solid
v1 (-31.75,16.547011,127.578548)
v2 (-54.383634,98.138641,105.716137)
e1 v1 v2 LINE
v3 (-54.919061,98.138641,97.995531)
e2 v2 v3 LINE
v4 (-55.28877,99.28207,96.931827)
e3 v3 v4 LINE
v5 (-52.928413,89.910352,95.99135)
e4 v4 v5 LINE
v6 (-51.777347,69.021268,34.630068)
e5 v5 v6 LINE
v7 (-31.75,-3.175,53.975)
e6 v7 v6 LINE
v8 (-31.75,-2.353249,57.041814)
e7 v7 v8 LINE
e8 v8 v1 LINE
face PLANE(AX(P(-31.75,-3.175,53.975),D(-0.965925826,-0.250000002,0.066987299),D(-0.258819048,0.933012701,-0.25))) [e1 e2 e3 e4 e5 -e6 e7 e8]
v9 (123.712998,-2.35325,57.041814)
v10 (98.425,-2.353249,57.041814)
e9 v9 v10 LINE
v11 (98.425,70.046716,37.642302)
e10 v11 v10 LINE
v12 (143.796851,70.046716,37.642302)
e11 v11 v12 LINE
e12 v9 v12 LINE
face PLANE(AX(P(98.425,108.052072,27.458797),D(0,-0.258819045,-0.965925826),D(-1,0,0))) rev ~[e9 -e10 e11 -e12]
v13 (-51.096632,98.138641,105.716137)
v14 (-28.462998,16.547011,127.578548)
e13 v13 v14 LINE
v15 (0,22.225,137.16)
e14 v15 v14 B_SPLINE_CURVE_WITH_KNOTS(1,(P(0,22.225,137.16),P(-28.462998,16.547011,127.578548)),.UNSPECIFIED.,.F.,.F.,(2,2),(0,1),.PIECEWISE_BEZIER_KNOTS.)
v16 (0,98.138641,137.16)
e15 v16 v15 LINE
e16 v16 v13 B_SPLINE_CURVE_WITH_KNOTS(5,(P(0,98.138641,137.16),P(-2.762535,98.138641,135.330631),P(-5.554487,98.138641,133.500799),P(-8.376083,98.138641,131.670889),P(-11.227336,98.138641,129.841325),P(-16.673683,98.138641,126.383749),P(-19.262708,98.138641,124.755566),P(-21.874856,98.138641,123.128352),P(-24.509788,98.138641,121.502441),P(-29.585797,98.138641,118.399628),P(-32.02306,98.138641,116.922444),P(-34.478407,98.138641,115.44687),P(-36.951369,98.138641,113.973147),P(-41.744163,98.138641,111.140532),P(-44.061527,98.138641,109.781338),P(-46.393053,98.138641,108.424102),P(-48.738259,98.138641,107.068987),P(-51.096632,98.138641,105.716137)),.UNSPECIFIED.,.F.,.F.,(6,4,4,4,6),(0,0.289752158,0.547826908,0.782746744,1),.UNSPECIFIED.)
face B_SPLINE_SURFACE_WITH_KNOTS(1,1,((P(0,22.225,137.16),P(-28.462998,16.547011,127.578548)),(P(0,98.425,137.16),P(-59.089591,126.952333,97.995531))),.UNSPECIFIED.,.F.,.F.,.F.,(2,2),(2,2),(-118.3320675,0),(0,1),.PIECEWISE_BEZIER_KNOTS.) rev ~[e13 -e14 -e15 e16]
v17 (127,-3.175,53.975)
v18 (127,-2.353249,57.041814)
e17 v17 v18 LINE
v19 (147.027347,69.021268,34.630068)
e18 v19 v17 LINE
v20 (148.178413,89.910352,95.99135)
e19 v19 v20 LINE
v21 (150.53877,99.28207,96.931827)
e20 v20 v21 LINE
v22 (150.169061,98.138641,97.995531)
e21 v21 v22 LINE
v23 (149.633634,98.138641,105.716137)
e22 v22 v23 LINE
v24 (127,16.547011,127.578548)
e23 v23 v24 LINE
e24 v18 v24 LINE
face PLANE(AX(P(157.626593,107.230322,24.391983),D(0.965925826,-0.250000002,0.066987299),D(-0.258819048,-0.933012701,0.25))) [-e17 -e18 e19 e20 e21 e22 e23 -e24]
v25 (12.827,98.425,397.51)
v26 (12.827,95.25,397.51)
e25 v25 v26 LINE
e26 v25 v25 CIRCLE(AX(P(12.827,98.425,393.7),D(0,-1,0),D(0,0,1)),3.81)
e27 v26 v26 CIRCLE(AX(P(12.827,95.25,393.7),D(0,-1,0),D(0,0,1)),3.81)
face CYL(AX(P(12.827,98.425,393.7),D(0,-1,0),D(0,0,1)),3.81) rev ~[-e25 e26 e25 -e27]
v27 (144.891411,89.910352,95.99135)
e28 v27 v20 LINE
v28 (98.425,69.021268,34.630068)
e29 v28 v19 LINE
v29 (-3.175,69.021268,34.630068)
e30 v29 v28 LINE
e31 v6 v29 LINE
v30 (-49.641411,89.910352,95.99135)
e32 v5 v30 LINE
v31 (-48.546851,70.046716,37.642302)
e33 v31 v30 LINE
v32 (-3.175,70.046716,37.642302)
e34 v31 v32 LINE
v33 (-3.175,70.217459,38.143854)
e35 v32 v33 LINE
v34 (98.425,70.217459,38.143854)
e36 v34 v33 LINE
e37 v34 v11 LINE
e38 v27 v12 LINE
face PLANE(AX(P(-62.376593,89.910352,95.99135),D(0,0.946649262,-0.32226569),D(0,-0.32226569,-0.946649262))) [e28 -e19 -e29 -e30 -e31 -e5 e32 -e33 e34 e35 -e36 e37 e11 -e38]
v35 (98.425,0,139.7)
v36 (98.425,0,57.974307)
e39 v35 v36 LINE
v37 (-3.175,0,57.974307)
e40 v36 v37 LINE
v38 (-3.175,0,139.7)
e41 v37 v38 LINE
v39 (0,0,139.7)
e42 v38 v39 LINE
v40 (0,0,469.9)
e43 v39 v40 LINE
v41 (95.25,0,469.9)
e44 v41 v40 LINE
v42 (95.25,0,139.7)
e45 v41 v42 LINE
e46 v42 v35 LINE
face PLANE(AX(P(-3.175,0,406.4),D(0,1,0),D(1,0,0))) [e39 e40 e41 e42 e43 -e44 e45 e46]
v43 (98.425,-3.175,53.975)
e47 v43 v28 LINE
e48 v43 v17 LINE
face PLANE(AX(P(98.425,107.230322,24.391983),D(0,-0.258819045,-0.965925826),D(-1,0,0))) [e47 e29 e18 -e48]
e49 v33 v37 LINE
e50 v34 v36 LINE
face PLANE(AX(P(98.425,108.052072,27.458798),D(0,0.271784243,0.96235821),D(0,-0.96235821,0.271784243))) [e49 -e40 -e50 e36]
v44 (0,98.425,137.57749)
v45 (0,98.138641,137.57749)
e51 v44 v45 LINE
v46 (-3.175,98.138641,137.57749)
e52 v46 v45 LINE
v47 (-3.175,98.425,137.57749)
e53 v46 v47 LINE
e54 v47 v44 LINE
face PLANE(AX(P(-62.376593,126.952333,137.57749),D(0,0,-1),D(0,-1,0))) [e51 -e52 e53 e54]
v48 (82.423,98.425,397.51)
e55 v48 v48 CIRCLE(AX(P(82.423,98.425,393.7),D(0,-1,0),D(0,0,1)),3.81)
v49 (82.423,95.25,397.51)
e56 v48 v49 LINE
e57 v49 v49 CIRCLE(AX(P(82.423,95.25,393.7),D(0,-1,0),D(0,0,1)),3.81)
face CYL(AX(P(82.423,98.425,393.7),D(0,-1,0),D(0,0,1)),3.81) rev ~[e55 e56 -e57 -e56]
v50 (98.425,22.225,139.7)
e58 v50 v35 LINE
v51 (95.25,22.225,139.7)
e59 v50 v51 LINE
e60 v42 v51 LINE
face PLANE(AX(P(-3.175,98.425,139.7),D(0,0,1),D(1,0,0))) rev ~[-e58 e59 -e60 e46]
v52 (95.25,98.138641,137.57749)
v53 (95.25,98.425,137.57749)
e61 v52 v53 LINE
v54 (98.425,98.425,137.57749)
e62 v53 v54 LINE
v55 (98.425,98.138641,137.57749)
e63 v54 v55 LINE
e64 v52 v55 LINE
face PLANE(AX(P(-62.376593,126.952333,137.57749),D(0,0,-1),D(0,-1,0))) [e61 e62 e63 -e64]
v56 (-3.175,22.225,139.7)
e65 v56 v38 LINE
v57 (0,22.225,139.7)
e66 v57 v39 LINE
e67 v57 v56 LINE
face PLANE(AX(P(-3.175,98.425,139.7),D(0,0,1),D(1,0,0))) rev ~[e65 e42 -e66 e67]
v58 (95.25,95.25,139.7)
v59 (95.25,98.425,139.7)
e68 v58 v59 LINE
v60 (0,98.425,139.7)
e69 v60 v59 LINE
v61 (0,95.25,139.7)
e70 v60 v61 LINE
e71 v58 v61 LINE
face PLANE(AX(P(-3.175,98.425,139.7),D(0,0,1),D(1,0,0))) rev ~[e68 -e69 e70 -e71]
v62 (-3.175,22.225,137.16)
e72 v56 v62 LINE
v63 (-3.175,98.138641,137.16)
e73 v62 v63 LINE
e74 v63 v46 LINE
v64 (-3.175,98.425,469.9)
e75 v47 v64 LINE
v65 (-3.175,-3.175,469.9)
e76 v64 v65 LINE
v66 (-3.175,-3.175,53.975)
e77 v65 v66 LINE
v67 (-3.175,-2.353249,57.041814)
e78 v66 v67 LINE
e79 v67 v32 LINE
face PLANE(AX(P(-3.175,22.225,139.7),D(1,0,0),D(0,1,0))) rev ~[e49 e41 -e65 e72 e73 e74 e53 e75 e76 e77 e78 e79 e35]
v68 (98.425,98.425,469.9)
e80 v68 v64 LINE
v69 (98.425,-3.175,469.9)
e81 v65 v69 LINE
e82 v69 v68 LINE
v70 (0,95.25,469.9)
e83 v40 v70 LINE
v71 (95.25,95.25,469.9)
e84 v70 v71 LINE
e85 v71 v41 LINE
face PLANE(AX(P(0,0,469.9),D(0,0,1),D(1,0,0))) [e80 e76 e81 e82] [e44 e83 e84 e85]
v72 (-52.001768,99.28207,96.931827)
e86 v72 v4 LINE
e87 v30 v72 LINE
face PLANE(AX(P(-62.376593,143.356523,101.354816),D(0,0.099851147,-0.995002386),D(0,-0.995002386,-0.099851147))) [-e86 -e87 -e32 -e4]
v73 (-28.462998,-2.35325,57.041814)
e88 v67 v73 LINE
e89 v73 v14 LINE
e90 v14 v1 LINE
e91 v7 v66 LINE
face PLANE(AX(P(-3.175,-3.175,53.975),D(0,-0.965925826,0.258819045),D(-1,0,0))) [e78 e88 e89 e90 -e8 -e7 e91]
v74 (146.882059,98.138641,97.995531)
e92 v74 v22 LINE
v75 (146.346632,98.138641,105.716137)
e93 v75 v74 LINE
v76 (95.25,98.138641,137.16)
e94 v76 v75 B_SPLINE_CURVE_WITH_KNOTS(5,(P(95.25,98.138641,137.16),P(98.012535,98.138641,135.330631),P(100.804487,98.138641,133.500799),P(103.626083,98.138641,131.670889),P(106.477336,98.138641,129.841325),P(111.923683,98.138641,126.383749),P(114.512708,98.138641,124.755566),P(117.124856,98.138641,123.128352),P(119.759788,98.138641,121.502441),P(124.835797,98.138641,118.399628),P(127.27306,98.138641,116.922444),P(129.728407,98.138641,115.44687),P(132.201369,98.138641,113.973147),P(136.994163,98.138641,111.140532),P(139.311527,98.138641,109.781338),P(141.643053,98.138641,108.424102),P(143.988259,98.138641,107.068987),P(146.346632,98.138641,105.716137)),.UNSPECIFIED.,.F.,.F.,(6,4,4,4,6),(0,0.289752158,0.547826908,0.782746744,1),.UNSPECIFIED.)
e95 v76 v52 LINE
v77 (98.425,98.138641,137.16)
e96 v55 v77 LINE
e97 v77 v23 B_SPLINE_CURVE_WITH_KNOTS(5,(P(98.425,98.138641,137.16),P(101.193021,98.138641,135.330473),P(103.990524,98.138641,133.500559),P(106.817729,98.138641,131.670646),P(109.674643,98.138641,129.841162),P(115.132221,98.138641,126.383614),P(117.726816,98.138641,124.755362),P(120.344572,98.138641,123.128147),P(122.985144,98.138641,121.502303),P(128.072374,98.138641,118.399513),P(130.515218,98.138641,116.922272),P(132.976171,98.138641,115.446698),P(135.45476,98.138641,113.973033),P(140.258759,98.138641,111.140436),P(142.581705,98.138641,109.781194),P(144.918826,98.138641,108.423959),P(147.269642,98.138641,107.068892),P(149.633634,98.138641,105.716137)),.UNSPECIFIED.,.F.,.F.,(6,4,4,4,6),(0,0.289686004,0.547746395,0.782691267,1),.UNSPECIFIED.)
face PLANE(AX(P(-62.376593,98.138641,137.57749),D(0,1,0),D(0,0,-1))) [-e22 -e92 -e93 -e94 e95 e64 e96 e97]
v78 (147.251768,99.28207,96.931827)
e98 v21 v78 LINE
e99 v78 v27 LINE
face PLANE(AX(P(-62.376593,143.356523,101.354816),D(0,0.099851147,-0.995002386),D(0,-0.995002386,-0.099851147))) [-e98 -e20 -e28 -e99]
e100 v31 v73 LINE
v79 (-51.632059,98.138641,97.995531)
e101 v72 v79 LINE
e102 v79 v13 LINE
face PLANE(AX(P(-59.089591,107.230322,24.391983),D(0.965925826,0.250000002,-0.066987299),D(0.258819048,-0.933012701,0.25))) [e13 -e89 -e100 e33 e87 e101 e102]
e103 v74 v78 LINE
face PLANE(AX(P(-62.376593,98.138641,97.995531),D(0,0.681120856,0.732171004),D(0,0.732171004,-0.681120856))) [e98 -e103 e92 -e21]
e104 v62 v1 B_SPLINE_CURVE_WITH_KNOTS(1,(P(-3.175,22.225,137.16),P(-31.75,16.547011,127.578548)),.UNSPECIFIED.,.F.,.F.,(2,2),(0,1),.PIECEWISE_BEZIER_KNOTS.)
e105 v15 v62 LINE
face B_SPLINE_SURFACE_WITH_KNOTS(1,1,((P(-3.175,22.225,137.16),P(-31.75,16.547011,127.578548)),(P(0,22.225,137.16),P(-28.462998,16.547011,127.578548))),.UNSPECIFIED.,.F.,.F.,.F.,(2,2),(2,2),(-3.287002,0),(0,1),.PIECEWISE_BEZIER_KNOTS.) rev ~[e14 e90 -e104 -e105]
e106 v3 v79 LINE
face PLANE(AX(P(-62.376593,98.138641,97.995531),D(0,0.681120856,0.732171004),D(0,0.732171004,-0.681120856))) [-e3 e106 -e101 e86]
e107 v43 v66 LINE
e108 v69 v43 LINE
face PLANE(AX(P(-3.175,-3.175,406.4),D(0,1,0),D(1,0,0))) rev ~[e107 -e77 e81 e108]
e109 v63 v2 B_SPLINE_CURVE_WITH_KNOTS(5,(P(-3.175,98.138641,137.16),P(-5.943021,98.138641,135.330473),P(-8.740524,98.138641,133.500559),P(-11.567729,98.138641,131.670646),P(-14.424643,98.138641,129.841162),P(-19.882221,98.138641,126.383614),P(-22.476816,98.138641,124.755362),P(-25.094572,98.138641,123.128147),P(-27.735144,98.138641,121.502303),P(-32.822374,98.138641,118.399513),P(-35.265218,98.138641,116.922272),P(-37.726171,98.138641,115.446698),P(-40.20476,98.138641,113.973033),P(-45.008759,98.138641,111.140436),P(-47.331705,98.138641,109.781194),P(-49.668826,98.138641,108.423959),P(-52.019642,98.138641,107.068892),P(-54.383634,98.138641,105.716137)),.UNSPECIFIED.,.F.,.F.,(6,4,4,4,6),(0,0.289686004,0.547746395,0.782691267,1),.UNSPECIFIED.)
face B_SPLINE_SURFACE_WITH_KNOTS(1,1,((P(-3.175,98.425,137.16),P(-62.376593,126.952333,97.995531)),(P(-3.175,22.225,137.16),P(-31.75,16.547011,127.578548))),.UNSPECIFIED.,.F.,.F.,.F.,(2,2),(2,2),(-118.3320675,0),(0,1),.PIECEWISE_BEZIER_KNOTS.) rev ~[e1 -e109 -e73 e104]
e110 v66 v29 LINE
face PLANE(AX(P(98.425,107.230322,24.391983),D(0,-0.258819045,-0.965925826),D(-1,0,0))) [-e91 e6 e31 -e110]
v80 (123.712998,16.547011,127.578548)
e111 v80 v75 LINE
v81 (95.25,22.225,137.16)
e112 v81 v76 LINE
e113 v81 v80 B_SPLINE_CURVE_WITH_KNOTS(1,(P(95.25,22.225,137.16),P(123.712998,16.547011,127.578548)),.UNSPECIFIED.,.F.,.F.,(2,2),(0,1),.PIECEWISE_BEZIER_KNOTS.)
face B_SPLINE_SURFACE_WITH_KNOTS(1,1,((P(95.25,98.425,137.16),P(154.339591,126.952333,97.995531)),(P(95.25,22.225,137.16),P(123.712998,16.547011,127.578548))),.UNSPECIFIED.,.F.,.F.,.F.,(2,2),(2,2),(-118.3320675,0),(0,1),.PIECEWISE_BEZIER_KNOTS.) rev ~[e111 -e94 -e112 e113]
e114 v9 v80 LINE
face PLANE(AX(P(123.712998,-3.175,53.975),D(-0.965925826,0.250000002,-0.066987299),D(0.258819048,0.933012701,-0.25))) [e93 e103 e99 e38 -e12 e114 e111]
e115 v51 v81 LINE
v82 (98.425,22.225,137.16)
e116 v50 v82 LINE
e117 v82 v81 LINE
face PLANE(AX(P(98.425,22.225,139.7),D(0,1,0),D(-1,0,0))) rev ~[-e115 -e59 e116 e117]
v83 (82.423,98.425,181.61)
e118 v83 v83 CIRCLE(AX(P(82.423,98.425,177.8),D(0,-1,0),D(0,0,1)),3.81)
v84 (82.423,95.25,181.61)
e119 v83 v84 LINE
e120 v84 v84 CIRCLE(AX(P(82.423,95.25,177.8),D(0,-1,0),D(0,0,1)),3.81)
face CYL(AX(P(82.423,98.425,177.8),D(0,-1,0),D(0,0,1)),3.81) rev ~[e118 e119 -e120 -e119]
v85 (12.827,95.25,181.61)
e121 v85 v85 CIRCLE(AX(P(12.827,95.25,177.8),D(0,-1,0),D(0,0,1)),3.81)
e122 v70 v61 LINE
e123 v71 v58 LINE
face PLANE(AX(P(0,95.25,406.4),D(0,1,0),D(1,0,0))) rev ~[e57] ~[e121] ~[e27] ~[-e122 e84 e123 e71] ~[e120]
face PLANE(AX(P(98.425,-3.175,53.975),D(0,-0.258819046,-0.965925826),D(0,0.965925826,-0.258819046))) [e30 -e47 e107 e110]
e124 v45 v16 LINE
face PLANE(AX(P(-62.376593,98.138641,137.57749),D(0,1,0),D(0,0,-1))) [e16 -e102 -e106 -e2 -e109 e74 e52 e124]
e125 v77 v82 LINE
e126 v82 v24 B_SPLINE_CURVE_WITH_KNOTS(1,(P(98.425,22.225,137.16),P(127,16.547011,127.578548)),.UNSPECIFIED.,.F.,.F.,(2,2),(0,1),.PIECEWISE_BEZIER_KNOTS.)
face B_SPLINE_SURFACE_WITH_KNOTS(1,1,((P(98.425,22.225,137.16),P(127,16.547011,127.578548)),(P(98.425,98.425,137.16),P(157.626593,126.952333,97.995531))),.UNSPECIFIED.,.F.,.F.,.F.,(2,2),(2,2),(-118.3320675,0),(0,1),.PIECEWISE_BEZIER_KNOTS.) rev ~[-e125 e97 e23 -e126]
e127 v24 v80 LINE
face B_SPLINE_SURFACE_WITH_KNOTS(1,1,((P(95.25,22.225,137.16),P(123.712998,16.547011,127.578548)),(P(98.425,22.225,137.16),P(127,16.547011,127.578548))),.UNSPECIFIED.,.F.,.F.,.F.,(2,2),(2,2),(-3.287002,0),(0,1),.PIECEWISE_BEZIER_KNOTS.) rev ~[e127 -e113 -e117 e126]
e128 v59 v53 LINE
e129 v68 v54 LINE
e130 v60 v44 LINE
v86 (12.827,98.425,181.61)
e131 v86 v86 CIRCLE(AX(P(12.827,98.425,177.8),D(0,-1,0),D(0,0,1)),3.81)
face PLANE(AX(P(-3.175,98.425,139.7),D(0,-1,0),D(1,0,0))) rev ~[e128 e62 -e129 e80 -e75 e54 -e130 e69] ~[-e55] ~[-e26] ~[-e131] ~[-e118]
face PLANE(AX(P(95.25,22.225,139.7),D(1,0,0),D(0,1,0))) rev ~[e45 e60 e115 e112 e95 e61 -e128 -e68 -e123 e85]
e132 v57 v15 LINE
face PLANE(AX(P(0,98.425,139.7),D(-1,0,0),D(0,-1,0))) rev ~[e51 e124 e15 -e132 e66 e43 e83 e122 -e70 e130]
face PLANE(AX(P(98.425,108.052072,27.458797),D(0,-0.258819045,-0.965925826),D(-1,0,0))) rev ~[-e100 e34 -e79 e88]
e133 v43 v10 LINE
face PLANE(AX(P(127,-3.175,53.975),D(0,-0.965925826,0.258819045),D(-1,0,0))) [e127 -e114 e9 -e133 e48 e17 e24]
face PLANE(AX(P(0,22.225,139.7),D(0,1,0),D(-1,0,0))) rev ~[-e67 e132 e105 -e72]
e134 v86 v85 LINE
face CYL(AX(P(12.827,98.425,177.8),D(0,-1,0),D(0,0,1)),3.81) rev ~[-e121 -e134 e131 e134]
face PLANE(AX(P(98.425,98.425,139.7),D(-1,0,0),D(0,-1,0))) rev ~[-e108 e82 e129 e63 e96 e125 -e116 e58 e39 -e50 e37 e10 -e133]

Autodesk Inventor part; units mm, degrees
sketch "Sketch1" plane through (0, 0, 0) normal (0, 0, 1) x (1, 0, 0)
  line L0 (0, 0) -> (95.25, 0)
  line L1 (95.25, 0) -> (95.25, 95.25)
  line L2 (95.25, 95.25) -> (0, 95.25)
  line L3 (0, 95.25) -> (0, 0)
  line L4 (-3.175, -3.175) -> (98.425, -3.175)
  line L5 (98.425, -3.175) -> (98.425, 98.425)
  line L6 (98.425, 98.425) -> (-3.175, 98.425)
  line L7 (-3.175, 98.425) -> (-3.175, -3.175)
  dimension "d0" = 95.25
  dimension "d1" = 95.25
  dimension "d2" = 3.175
sketch "Sketch1 outline for Extrusion1" plane through (0, 0, 0) normal (0, 0, 1) x (1, 0, 0)
  line L0 (-3.175, 98.425) -> (-3.175, -3.175)
  line L1 (98.425, 98.425) -> (-3.175, 98.425)
  line L2 (-3.175, -3.175) -> (98.425, -3.175)
  line L3 (98.425, -3.175) -> (98.425, 98.425)
  line L4 (0, 95.25) -> (0, 0)
  line L5 (0, 0) -> (95.25, 0)
  line L6 (95.25, 0) -> (95.25, 95.25)
  line L7 (95.25, 95.25) -> (0, 95.25)
extrude "Extrusion1" add sketch "Sketch1 outline for Extrusion1" along normal blind 406.4
sketch "Sketch3" plane through (0, 0, 0) normal (0, 0, -1) x (-1, 0, 0)
  line L0 (0, 95.25) -> (0, 0) projected
  line L1 (0, 0) -> (-95.25, 0) projected
  line L2 (-95.25, 0) -> (-95.25, 95.25) projected
  line L3 (-95.25, 95.25) -> (0, 95.25) projected
  line L4 (3.175, -3.175) -> (-98.425, -3.175) projected
  line L5 (3.175, 98.425) -> (3.175, -3.175) projected
  line L6 (-98.425, 98.425) -> (3.175, 98.425) projected
  line L7 (-98.425, -3.175) -> (-98.425, 98.425) projected
sketch "Sketch3 outline for Extrusion2" plane through (0, 0, 0) normal (0, 0, -1) x (-1, 0, 0)
  line L0 (-98.425, 98.425) -> (-98.425, -3.175)
  line L1 (3.175, 98.425) -> (-98.425, 98.425)
  line L2 (-98.425, -3.175) -> (3.175, -3.175)
  line L3 (3.175, -3.175) -> (3.175, 98.425)
  line L4 (-95.25, 95.25) -> (0, 95.25)
  line L5 (-95.25, 0) -> (-95.25, 95.25)
  line L6 (0, 0) -> (-95.25, 0)
  line L7 (0, 95.25) -> (0, 0)
extrude "Extrusion2" cut sketch "Sketch3 outline for Extrusion2" against normal blind 50.8
sketch "Sketch4" plane through (-3.175, 98.425, 406.4) normal (0, 1, 0) x (1, 0, 0)
  line L0 (101.6, 355.6) -> (0, 355.6) projected
  line L1 (0, 355.6) -> (0, 0) projected
  line L2 (101.6, 355.6) -> (0, 355.6)
  line L3 (0, 355.6) -> (0, 266.7)
  line L4 (0, 266.7) -> (101.6, 266.7)
  line L5 (101.6, 266.7) -> (101.6, 355.6)
  point P0 (3.175, 406.4)
  dimension "d7" = 88.9
sketch "Sketch4 outline for Extrusion3" plane through (-3.175, 98.425, 406.4) normal (0, 1, 0) x (1, 0, 0)
  line L0 (101.6, 266.7) -> (101.6, 355.6)
  line L1 (0, 266.7) -> (101.6, 266.7)
  line L2 (0, 355.6) -> (0, 266.7)
  line L3 (101.6, 355.6) -> (0, 355.6)
extrude "Extrusion3" cut sketch "Sketch4 outline for Extrusion3" against normal blind 98.425
sketch "Sketch5" plane through (0, 0, 50.8) normal (0, 0, -1) x (-1, 0, 0)
  line L0 (3.175, 0) -> (-98.425, 0)
  line L1 (-98.425, -3.175) -> (-98.425, 0)
  line L2 (3.175, 0) -> (3.175, -3.175)
  line L3 (3.175, -3.175) -> (55.29887, 140.034155)
  line L4 (3.175, -3.175) -> (155.575, -3.175) construction
  line L5 (-98.425, -3.175) -> (-150.54887, 140.034155)
  line L6 (-98.425, -3.175) -> (53.975, -3.175) construction
  line L7 (-98.425, -3.175) -> (3.175, -3.175)
  line L8 (-98.425, 98.425) -> (40.154376, 98.425)
  line L9 (-98.425, 98.425) -> (-135.404376, 98.425)
  point P0 (0, 0)
  dimension "d10" = 152.4
  dimension "d11" = 70
  dimension "d12" = 152.4
  dimension "d13" = 110
  dimension "d14" = 101.6
sketch "Sketch5 outline for Extrusion4" plane through (0, 0, 50.8) normal (0, 0, -1) x (-1, 0, 0)
  line L0 (-98.425, 0) -> (3.175, 0)
  line L1 (-98.425, -3.175) -> (-98.425, 0)
  line L2 (-135.404376, 98.425) -> (-98.425, -3.175)
  line L3 (-98.425, 98.425) -> (-135.404376, 98.425)
  line L4 (40.154376, 98.425) -> (-98.425, 98.425)
  line L5 (3.175, -3.175) -> (40.154376, 98.425)
  line L6 (3.175, 0) -> (3.175, -3.175)
extrude "Extrusion4" add sketch "Sketch5 outline for Extrusion4" against normal blind 3.175
sketch "Sketch6" plane through (0, 0, 53.975) normal (0, 0, 1) x (1, 0, 0)
  line L0 (-3.175, -3.175) -> (-40.154376, 98.425)
  line L1 (135.404376, 98.425) -> (98.425, -3.175)
  line L2 (-40.154376, 98.425) -> (135.404376, 98.425)
  line L3 (98.425, -3.175) -> (135.404376, 98.425)
  line L4 (-40.154376, 98.425) -> (-3.175, -3.175)
  line L5 (-3.175, -3.175) -> (98.425, -3.175)
  line L6 (130.870006, 95.25) -> (96.201841, 0)
  line L7 (96.201841, 0) -> (-0.951841, 0)
  line L8 (-0.951841, 0) -> (-35.620006, 95.25)
  line L9 (130.870006, 95.25) -> (132.025611, 98.425)
  line L10 (98.964652, 7.590761) -> (101.948176, 6.504847)
  line L11 (-3.714652, 7.590761) -> (-6.698176, 6.504847)
  line L12 (-35.620006, 95.25) -> (-36.775611, 98.425)
  line L13 (135.404376, 98.425) -> (132.025611, 98.425)
  line L14 (-36.775611, 98.425) -> (-40.154376, 98.425)
  point P0 (0, 0)
sketch "Sketch6 outline for Extrusion5" plane through (0, 0, 53.975) normal (0, 0, 1) x (1, 0, 0)
  line L0 (101.948176, 6.504847) -> (135.404376, 98.425)
  line L1 (135.404376, 98.425) -> (132.025611, 98.425)
  line L2 (132.025611, 98.425) -> (98.964652, 7.590761)
  line L3 (98.964652, 7.590761) -> (101.948176, 6.504847)
  line L4 (-36.775611, 98.425) -> (-40.154376, 98.425)
  line L5 (-40.154376, 98.425) -> (-6.698176, 6.504847)
  line L6 (-6.698176, 6.504847) -> (-3.714652, 7.590761)
  line L7 (-3.714652, 7.590761) -> (-36.775611, 98.425)
extrude "Extrusion5" add sketch "Sketch6 outline for Extrusion5" along normal blind 82.55
sketch "Sketch7" plane through (0, 0, 406.4) normal (0, 0, 1) x (1, 0, 0)
  line L0 (0, 0) -> (0, 95.25) projected
  line L1 (0, 95.25) -> (95.25, 95.25) projected
  line L2 (95.25, 95.25) -> (95.25, 0) projected
  line L3 (95.25, 0) -> (0, 0) projected
  line L4 (-3.175, -3.175) -> (-3.175, 98.425) projected
  line L5 (98.425, -3.175) -> (-3.175, -3.175) projected
  line L6 (98.425, 98.425) -> (98.425, -3.175) projected
  line L7 (-3.175, 98.425) -> (98.425, 98.425) projected
sketch "Sketch7 outline for Extrusion6" plane through (0, 0, 406.4) normal (0, 0, 1) x (1, 0, 0)
  line L0 (98.425, 98.425) -> (-3.175, 98.425)
  line L1 (98.425, -3.175) -> (98.425, 98.425)
  line L2 (-3.175, 98.425) -> (-3.175, -3.175)
  line L3 (-3.175, -3.175) -> (98.425, -3.175)
  line L4 (95.25, 0) -> (0, 0)
  line L5 (95.25, 95.25) -> (95.25, 0)
  line L6 (0, 95.25) -> (95.25, 95.25)
  line L7 (0, 0) -> (0, 95.25)
extrude "Extrusion6" add sketch "Sketch7 outline for Extrusion6" along normal blind 88.9
ref_plane "Work Plane1" through (47.625, 0, 139.7) normal (-1, 0, 0) x (0, 0, 1)
sketch "Sketch8" plane through (98.425, 0, 139.7) normal (1, 0, 0) x (0, 0, -1)
  line L0 (85.725, -3.175) -> (-355.6, -3.175)
  line L1 (209.478818, 0) -> (209.478818, 140.094792)
  line L2 (209.478818, 140.094792) -> (0, 140.094792)
  line L3 (0, 140.094792) -> (0, 0)
  line L4 (0, 0) -> (209.478818, 0)
  point P0 (139.7, 0)
  point P1 (0, -3.175)
sketch "Sketch8 outline for Extrusion7" plane through (98.425, 0, 139.7) normal (1, 0, 0) x (0, 0, -1)
  line L0 (209.478818, 140.094792) -> (209.478818, 0)
  line L1 (209.478818, 0) -> (0, 0)
  line L2 (0, 0) -> (0, 140.094792)
  line L3 (0, 140.094792) -> (209.478818, 140.094792)
extrude "Extrusion7" cut sketch "Sketch8 outline for Extrusion7" along normal through all both and the other way through all
sketch "Sketch9" plane through (0, 0, 495.3) normal (0, 0, 1) x (1, 0, 0)
  line L0 (0, 95.25) -> (95.25, 95.25) projected
  line L1 (95.25, 95.25) -> (95.25, 0) projected
  line L2 (95.25, 0) -> (0, 0) projected
  line L3 (0, 0) -> (0, 95.25) projected
  line L4 (-3.175, 98.425) -> (98.425, 98.425) projected
  line L5 (-3.175, -3.175) -> (-3.175, 98.425) projected
  line L6 (98.425, -3.175) -> (-3.175, -3.175) projected
  line L7 (98.425, 98.425) -> (98.425, -3.175) projected
sketch "Sketch9 outline for Extrusion8" plane through (0, 0, 495.3) normal (0, 0, 1) x (1, 0, 0)
  line L0 (98.425, -3.175) -> (98.425, 98.425)
  line L1 (-3.175, -3.175) -> (98.425, -3.175)
  line L2 (98.425, 98.425) -> (-3.175, 98.425)
  line L3 (-3.175, 98.425) -> (-3.175, -3.175)
  line L4 (0, 0) -> (0, 95.25)
  line L5 (95.25, 0) -> (0, 0)
  line L6 (95.25, 95.25) -> (95.25, 0)
  line L7 (0, 95.25) -> (95.25, 95.25)
extrude "Extrusion8" cut sketch "Sketch9 outline for Extrusion8" against normal blind 25.4
ref_plane "Work Plane3" through (99.580605, 0, 53.975) normal (1, 0, 0) x (0, 0, -1)
sketch "Sketch11" plane through (99.580605, 0, 53.975) normal (1, 0, 0) x (0, 0, -1)
  line L0 (0, 0) -> (4.92371, 0)
  line L1 (4.92371, 0) -> (4.92371, -5.872358)
  line L2 (4.92371, -5.872358) -> (0, -5.872358)
  line L3 (0, -5.872358) -> (0, 0)
  point P0 (53.975, 0)
sketch "Sketch11 outline for Extrusion9" plane through (99.580605, 0, 53.975) normal (1, 0, 0) x (0, 0, -1)
  line L0 (0, 0) -> (4.92371, 0)
  line L1 (4.92371, 0) -> (4.92371, -5.872358)
  line L2 (4.92371, -5.872358) -> (0, -5.872358)
  line L3 (0, -5.872358) -> (0, 0)
extrude "Extrusion9" cut sketch "Sketch11 outline for Extrusion9" against normal through all
sketch "Sketch12" plane through (98.425, 0, 139.7) normal (1, 0, 0) x (0, 0, -1)
  line L0 (85.725, -3.175) -> (85.725, 0)
  line L1 (85.725, 0) -> (0, 0)
  line L2 (85.725, -3.175) -> (115.308017, 107.230322)
  line L3 (85.725, -3.175) -> (200.025, -3.175) construction
  line L4 (115.308017, 107.230322) -> (112.241202, 108.052072)
  line L5 (112.241202, 108.052072) -> (81.725693, 0)
  line L6 (81.725693, 0) -> (85.725, -3.175)
  point P0 (139.7, 0)
  dimension "d29" = 114.3
  dimension "d30" = 75
  dimension "d31" = 3.175
sketch "Sketch12 outline for Extrusion10" plane through (98.425, 0, 139.7) normal (1, 0, 0) x (0, 0, -1)
  line L0 (85.725, 0) -> (85.725, -3.175)
  line L1 (81.725693, 0) -> (85.725, 0)
  line L2 (112.241202, 108.052072) -> (81.725693, 0)
  line L3 (115.308017, 107.230322) -> (112.241202, 108.052072)
  line L4 (85.725, -3.175) -> (115.308017, 107.230322)
extrude "Extrusion10" add sketch "Sketch12 outline for Extrusion10" against normal blind 101.6
sketch "Sketch13" plane through (98.425, 107.230322, 24.391983) normal (0, -0.258819, -0.9659258) x (-1, 0, 0)
  line L0 (101.6, -114.3) -> (101.6, 0)
  line L1 (0, 0) -> (101.6, 0)
  line L2 (0, -114.3) -> (0, 0)
  line L3 (101.6, -114.3) -> (0, -114.3)
  line L4 (0, -114.3) -> (101.6, -114.3)
  line L5 (101.6, -114.3) -> (130.175, -114.3)
  line L6 (130.175, -114.3) -> (160.801593, 0)
  line L7 (0, -114.3) -> (-28.575, -114.3)
  line L8 (-28.575, -114.3) -> (-59.201593, 0)
  line L9 (160.801593, 0) -> (-59.201593, 0)
  point P0 (98.425, -97.263428)
  dimension "d34" = 28.575
  dimension "d35" = 105
  dimension "d36" = 28.575
  dimension "d37" = 105
  dimension "d40" = 114.3
sketch "Sketch13 outline for Extrusion11" plane through (98.425, 107.230322, 24.391983) normal (0, -0.258819, -0.9659258) x (-1, 0, 0)
  line L0 (-28.575, -114.3) -> (0, -114.3)
  line L1 (-59.201593, 0) -> (-28.575, -114.3)
  line L2 (0, 0) -> (-59.201593, 0)
  line L3 (0, 0) -> (0, -114.3)
  line L4 (101.6, -114.3) -> (101.6, 0)
  line L5 (160.801593, 0) -> (101.6, 0)
  line L6 (130.175, -114.3) -> (160.801593, 0)
  line L7 (101.6, -114.3) -> (130.175, -114.3)
extrude "Extrusion11" add sketch "Sketch13 outline for Extrusion11" against normal blind 3.175
sketch "Sketch14" plane through (127, -3.175, 53.975) normal (0, -0.258819, -0.9659258) x (-1, 0, 0)
  line L0 (189.376593, 114.3) -> (-30.626593, 114.3)
  line L1 (-30.626593, 114.3) -> (0, 0)
  line L2 (130.175, 0) -> (158.75, 0)
  line L3 (158.75, 0) -> (189.376593, 114.3)
  line L4 (-30.626593, 114.3) -> (0, 0)
  line L5 (0, 0) -> (158.75, 0)
  line L6 (158.75, 0) -> (189.376593, 114.3)
  line L7 (186.309778, 115.12175) -> (156.313737, 3.175)
  line L8 (156.313737, 3.175) -> (2.436263, 3.175)
  line L9 (2.436263, 3.175) -> (-27.559778, 115.12175)
  line L10 (-30.626593, 114.3) -> (-27.339591, 114.3)
  line L11 (189.376593, 114.3) -> (186.089591, 114.3)
  line L12 (0, 0) -> (28.575, 0)
  line L13 (156.313737, 3.175) -> (155.462998, 0)
  line L14 (2.436263, 3.175) -> (3.287002, 0)
  point P0 (127, 17.036572)
  dimension "d41" = 3.175
sketch "Sketch14 outline for Extrusion12" plane through (127, -3.175, 53.975) normal (0, -0.258819, -0.9659258) x (-1, 0, 0)
  line L0 (158.75, 0) -> (189.376593, 114.3)
  line L1 (189.376593, 114.3) -> (186.089591, 114.3)
  line L2 (186.089591, 114.3) -> (155.462998, 0)
  line L3 (155.462998, 0) -> (158.75, 0)
  line L4 (-27.339591, 114.3) -> (-30.626593, 114.3)
  line L5 (-30.626593, 114.3) -> (0, 0)
  line L6 (0, 0) -> (3.287002, 0)
  line L7 (3.287002, 0) -> (-27.339591, 114.3)
extrude "Extrusion12" add sketch "Sketch14 outline for Extrusion12" against normal blind 76.2
sketch "Sketch15" plane through (98.425, 98.425, 139.7) normal (0, 0, -1) x (-1, 0, 0)
  line L0 (3.175, -3.175) -> (3.175, -98.425) projected
  line L1 (0, 0) -> (3.175, 0)
  line L2 (3.175, 0) -> (3.175, -76.2)
  line L3 (3.175, -76.2) -> (0, -76.2)
  line L4 (0, -76.2) -> (0, 0)
  dimension "d44" = 76.2
sketch "Sketch15 outline for Extrusion13" plane through (98.425, 98.425, 139.7) normal (0, 0, -1) x (-1, 0, 0)
  line L0 (3.175, 0) -> (0, 0)
  line L1 (3.175, -76.2) -> (3.175, 0)
  line L2 (0, -76.2) -> (3.175, -76.2)
  line L3 (0, 0) -> (0, -76.2)
extrude "Extrusion13" add sketch "Sketch15 outline for Extrusion13" along normal blind 2.54
loft "Loft1" add section 1 edges at (96.8375, 98.425, 137.16) (98.425, 60.325, 137.16) (96.8375, 22.225, 137.16) (95.25, 60.325, 137.16) section 2 edges at (125.356499, 16.547011, 127.578548) (142.313296, 71.749672, 112.78704) (155.983092, 126.952333, 97.995531) (139.026294, 71.749672, 112.78704)
sketch "Sketch16" plane through (95.25, 98.425, 139.7) normal (0, 0, -1) x (-1, 0, 0)
  line L0 (95.25, -98.425) -> (95.25, -3.175) projected
  line L1 (98.425, 0) -> (95.25, 0)
  line L2 (95.25, 0) -> (95.25, -76.2)
  line L3 (95.25, -76.2) -> (98.425, -76.2)
  line L4 (98.425, -76.2) -> (98.425, 0)
  dimension "d51" = 76.2
sketch "Sketch16 outline for Extrusion14" plane through (95.25, 98.425, 139.7) normal (0, 0, -1) x (-1, 0, 0)
  line L0 (95.25, 0) -> (95.25, -76.2)
  line L1 (98.425, 0) -> (95.25, 0)
  line L2 (98.425, -76.2) -> (98.425, 0)
  line L3 (95.25, -76.2) -> (98.425, -76.2)
extrude "Extrusion14" add sketch "Sketch16 outline for Extrusion14" along normal blind 2.54
loft "Loft2" add section 1 edges at (0, 60.325, 137.16) (-1.5875, 22.225, 137.16) (-3.175, 60.325, 137.16) (-1.5875, 98.425, 137.16) section 2 edges at (-43.776294, 71.749672, 112.78704) (-60.733092, 126.952333, 97.995531) (-47.063296, 71.749672, 112.78704) (-30.106499, 16.547011, 127.578548)
ref_plane "Work Plane4" through (-62.376593, 126.952333, 97.995531) normal (-1, 0, 0) x (0, 0, 1)
sketch "Sketch17" plane through (-62.376593, 126.952333, 97.995531) normal (-1, 0, 0) x (0, 0, 1)
  line L0 (0, 0) -> (39.581959, 0)
  line L1 (39.581959, 0) -> (39.581959, -28.813692)
  line L2 (39.581959, -28.813692) -> (0, -28.813692)
  line L3 (0, -28.813692) -> (-21.532096, -5.667761)
  line L4 (-21.532096, -5.667761) -> (0, 0)
  point P0 (-97.995531, -126.952333)
sketch "Sketch17 outline for Extrusion15" plane through (-62.376593, 126.952333, 97.995531) normal (-1, 0, 0) x (0, 0, 1)
  line L0 (0, 0) -> (39.581959, 0)
  line L1 (39.581959, 0) -> (39.581959, -28.813692)
  line L2 (39.581959, -28.813692) -> (0, -28.813692)
  line L3 (0, -28.813692) -> (-21.532096, -5.667761)
  line L4 (-21.532096, -5.667761) -> (0, 0)
extrude "Extrusion15" cut sketch "Sketch17 outline for Extrusion15" against normal through all
ref_plane "Work Plane5" through (-62.376593, 121.203127, 76.539202) normal (-1, 0, 0) x (0, 0, 1)
sketch "Sketch18" plane through (-62.376593, 121.203127, 76.539202) normal (-1, 0, 0) x (0, 0, 1)
  line L0 (19.452148, -31.292775) -> (-58.109978, -57.697076)
  line L1 (19.452148, -31.292775) -> (24.815614, 22.153396)
  line L2 (24.815614, 22.153396) -> (-54.454563, 58.685988)
  line L3 (-58.109978, -57.697076) -> (-54.454563, 58.685988)
  point P0 (-76.539202, -121.203127)
sketch "Sketch18 outline for Extrusion16" plane through (-62.376593, 121.203127, 76.539202) normal (-1, 0, 0) x (0, 0, 1)
  line L0 (19.452148, -31.292775) -> (-58.109978, -57.697076)
  line L1 (-58.109978, -57.697076) -> (-54.454563, 58.685988)
  line L2 (-54.454563, 58.685988) -> (24.815614, 22.153396)
  line L3 (24.815614, 22.153396) -> (19.452148, -31.292775)
extrude "Extrusion16" cut sketch "Sketch18 outline for Extrusion16" against normal through all
sketch "Sketch19" plane through (0, 98.425, 139.7) normal (0, 1, 0) x (1, 0, 0)
  line L0 (-3.175, 2.12251) -> (-3.175, -330.2)
  line L1 (-3.175, -330.2) -> (98.425, -330.2)
  line L2 (98.425, 2.12251) -> (98.425, -330.2)
  line L3 (95.25, 0) -> (0, 0)
  line L4 (-3.175, 0) -> (12.827, 0)
  line L5 (12.827, 0) -> (12.827, -38.1)
  line L6 (98.425, 0) -> (82.423, 0)
  line L7 (82.423, 0) -> (82.423, -38.1)
  line L8 (-3.175, -330.2) -> (12.827, -330.2)
  line L9 (98.425, -330.2) -> (82.423, -330.2)
  line L10 (82.423, -330.2) -> (82.423, -254)
  line L11 (12.827, -330.2) -> (12.827, -254)
  point P0 (0, 139.7)
  dimension "d62" = 16.002
  dimension "d63" = 38.1
  dimension "d64" = 16.002
  dimension "d65" = 76.2
  dimension "d66" = 76.2
hole "Hole1" at (12.827, 98.425, 177.8) at (82.423, 98.425, 177.8) at (12.827, 98.425, 393.7) at (82.423, 98.425, 393.7) direction (0, -1, 0) diameter 7.62 depth 25.4 tip angle 118
equation "\"d0\" = d1"
properties part number "Ball Collector"
